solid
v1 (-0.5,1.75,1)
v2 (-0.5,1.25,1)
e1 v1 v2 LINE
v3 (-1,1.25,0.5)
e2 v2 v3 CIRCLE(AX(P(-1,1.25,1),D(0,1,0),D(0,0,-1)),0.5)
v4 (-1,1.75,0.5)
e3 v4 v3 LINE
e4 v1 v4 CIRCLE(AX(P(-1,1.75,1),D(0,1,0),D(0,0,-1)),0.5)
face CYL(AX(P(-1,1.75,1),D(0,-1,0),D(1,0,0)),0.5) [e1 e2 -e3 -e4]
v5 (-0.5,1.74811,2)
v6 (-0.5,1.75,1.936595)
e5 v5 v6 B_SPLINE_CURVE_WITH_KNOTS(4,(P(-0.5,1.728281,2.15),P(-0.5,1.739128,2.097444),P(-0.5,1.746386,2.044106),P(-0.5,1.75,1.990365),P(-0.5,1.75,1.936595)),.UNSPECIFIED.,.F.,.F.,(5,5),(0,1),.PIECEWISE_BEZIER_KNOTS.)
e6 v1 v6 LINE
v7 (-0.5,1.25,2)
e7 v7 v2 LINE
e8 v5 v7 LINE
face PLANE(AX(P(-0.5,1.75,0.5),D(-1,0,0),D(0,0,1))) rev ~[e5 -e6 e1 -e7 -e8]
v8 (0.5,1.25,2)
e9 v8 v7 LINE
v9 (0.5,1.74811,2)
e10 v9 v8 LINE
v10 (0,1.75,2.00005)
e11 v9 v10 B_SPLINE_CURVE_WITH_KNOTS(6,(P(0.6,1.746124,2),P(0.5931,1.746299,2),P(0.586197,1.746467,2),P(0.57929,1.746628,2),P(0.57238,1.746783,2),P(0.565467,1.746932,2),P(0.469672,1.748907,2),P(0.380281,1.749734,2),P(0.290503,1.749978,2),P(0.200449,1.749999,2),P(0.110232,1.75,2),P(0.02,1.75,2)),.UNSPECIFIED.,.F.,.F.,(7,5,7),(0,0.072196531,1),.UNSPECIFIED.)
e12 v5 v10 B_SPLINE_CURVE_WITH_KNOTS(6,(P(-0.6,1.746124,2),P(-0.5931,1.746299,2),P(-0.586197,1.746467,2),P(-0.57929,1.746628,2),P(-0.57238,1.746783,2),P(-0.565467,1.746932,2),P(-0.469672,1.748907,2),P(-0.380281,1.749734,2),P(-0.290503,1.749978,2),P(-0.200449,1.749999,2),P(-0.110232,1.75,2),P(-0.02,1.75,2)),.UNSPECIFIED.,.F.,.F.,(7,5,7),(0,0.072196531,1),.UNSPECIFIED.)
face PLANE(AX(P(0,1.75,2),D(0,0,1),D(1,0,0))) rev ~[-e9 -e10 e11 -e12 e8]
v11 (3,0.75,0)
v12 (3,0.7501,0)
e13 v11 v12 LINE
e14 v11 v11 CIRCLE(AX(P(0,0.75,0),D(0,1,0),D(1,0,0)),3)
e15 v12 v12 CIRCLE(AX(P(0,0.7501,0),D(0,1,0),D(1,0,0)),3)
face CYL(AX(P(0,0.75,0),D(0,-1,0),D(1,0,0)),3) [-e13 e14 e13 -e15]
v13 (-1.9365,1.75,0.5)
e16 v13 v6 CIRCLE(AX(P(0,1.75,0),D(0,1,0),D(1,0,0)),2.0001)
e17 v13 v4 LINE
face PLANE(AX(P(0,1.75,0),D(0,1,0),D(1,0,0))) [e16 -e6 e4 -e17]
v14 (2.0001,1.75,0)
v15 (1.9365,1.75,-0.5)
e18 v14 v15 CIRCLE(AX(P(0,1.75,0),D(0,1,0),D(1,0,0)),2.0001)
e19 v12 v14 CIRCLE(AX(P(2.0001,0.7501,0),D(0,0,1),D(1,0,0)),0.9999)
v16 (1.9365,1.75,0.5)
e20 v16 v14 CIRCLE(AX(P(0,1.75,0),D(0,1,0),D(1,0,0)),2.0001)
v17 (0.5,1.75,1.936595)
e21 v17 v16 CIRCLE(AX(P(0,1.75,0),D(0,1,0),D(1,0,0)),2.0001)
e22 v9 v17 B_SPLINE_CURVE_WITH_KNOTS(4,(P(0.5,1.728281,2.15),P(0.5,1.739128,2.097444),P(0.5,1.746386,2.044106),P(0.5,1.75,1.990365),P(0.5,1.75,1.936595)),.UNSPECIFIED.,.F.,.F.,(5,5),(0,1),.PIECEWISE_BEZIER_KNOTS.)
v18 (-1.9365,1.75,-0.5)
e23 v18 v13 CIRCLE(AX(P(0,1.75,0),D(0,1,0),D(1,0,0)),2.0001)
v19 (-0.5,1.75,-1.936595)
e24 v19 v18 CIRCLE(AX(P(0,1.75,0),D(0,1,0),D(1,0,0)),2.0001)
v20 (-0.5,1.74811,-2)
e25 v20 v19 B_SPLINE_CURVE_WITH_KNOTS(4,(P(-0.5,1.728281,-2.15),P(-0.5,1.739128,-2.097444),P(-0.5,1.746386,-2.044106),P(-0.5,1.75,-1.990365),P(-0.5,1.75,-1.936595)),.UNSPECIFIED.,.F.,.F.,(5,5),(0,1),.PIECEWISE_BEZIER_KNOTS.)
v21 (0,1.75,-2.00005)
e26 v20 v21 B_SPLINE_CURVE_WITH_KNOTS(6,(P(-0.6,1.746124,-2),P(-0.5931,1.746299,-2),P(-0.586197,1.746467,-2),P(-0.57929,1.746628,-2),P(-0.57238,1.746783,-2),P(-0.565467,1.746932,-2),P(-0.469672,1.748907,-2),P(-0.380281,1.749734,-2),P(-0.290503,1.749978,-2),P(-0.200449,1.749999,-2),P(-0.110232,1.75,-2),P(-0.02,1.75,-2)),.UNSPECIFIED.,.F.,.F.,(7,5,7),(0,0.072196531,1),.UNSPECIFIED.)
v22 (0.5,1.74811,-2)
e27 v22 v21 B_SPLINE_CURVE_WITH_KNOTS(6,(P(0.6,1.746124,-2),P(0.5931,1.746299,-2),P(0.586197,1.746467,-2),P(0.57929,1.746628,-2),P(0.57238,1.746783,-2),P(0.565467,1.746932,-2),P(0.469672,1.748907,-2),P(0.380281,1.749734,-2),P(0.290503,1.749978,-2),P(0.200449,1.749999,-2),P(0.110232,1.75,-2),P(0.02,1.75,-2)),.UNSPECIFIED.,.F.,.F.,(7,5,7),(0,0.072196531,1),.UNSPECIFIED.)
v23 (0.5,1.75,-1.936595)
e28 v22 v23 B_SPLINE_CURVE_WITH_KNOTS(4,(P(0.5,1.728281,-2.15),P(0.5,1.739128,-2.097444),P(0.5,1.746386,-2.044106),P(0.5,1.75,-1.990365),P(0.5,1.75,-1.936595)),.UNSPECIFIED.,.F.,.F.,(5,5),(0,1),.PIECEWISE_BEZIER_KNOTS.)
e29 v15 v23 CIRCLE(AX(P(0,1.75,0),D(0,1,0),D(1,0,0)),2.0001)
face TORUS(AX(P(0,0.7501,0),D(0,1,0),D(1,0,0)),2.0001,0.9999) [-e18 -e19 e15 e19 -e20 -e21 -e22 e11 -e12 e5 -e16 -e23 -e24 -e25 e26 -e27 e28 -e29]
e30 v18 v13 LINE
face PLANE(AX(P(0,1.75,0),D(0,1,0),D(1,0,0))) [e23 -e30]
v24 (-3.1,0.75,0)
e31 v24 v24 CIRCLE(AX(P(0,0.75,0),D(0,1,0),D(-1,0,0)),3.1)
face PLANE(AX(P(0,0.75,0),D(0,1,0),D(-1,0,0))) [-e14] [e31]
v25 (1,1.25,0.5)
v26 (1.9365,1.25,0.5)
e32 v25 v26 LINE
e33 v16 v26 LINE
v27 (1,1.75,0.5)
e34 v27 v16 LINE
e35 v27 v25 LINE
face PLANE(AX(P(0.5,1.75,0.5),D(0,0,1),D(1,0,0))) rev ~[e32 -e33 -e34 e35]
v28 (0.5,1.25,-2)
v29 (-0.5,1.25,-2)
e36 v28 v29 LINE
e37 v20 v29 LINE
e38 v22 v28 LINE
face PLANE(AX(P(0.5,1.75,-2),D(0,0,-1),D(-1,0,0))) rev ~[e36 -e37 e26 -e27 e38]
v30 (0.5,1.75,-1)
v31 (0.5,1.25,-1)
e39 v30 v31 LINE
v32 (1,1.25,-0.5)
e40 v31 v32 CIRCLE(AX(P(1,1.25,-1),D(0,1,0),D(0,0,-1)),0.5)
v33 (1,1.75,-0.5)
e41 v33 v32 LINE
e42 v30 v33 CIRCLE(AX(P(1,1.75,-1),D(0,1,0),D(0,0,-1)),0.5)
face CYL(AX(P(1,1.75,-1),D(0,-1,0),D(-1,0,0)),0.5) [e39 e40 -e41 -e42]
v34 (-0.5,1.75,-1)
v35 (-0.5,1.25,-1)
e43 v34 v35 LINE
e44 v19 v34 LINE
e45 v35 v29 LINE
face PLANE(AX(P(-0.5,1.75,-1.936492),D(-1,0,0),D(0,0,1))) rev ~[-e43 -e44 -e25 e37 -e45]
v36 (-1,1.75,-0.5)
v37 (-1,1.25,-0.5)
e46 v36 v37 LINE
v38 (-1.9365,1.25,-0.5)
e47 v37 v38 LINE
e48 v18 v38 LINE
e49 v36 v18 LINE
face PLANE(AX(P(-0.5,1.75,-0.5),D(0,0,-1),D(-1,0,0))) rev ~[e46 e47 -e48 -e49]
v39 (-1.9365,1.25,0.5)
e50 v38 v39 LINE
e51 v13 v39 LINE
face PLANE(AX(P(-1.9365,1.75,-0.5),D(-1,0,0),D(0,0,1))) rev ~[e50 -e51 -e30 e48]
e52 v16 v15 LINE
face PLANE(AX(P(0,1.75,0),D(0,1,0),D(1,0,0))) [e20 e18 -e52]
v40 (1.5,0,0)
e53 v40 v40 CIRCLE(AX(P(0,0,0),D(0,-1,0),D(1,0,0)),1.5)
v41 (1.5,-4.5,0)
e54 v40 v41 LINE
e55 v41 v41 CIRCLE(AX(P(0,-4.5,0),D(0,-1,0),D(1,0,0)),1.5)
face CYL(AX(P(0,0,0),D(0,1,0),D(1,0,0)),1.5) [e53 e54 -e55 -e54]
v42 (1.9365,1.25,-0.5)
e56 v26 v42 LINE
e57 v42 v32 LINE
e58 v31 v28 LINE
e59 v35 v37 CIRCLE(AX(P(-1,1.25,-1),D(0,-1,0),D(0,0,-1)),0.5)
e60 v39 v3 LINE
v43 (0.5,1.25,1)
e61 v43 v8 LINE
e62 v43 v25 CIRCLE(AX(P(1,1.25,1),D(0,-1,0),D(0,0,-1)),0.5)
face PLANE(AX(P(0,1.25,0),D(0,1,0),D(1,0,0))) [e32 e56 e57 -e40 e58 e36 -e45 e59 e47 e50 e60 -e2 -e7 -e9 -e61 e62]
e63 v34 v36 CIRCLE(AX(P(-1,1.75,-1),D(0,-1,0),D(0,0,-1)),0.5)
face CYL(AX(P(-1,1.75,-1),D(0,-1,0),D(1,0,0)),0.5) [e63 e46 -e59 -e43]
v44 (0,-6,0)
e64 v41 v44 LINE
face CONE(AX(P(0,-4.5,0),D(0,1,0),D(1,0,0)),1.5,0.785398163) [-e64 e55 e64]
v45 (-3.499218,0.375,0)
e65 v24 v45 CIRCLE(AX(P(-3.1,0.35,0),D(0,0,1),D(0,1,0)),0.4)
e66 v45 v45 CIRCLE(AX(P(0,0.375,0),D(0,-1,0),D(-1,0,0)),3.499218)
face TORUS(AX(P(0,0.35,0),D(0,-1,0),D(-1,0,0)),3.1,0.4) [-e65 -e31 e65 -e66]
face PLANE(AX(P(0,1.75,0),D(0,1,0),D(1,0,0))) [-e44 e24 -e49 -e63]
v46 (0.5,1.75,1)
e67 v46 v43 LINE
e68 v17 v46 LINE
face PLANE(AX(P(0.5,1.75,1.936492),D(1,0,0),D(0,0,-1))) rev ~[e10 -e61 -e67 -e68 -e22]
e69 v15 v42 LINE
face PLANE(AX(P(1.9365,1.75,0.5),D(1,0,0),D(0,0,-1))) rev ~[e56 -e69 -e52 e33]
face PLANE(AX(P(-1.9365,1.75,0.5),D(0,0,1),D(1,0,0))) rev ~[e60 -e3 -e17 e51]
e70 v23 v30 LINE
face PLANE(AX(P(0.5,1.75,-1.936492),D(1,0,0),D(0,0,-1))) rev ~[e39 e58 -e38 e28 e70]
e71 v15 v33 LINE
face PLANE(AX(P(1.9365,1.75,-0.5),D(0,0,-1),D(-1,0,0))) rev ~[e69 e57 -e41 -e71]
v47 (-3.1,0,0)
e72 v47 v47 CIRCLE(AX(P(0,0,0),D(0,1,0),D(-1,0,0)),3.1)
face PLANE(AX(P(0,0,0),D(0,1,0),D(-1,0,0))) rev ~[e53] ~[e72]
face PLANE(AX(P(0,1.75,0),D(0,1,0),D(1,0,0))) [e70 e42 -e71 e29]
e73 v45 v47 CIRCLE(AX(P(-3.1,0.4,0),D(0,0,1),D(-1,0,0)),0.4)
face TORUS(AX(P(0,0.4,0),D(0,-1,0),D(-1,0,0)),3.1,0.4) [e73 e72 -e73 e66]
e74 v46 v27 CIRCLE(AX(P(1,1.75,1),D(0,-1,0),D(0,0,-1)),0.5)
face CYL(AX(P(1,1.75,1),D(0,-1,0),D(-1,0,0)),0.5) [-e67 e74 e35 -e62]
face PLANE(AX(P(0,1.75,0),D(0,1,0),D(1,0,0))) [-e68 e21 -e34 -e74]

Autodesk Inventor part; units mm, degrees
ref_plane "YZ Plane" through (0, 0, 0) normal (1, 0, 0) x (0, 1, 0)
ref_plane "XZ Plane" through (0, 0, 0) normal (0, 1, 0) x (-1, 0, 0)
ref_plane "XY Plane" through (0, 0, 0) normal (0, 0, 1) x (1, 0, 0)
sketch "Sketch1" plane through (0, 0, 0) normal (0, 1, 0) x (-1, 0, 0)
  circle A0 centre (0, 0) radius 3.5
  dimension "d0" = 7
extrude "Extrusion1" add sketch "Sketch1" along normal blind 0.75
sketch "Sketch2" plane through (0, 0.75, 0) normal (0, 1, 0) x (1, 0, 0)
  circle A0 centre (0, 0) radius 3
  dimension "d3" = 6
extrude "Extrusion2" add sketch "Sketch2" along normal blind 1
fillet "Fillet1" radius 1 1 edges at (-3, 1.75, 0)
fillet "Fillet2" radius 0.4 2 edges at (3.5, 0.75, 0) (3.5, 0, 0)
sketch "Sketch3" plane through (0, 0, 0) normal (0, -1, 0) x (1, 0, 0)
  circle A0 centre (0, 0) radius 1.5
  dimension "d8" = 3
extrude "Extrusion3" add sketch "Sketch3" along normal blind 6
chamfer "Chamfer1" distance 1.5 angle 45 1 edges at (-1.5, -6, 0)
thread "Thread1" size "M3x0.5" class "6g" standard "ANSI Metric M Profile" length 10
thread "Thread2" size "R 3" standard "ISO Taper" length 10
sketch "Sketch4" plane through (0, 1.75, 0) normal (0, 1, 0) x (1, 0, 0)
  line L0 (0.5, 2) -> (-0.5, 2)
  line L1 (-0.5, 2) -> (-0.5, -2)
  line L2 (-0.5, -2) -> (0.5, -2)
  line L3 (0.5, -2) -> (0.5, 2)
  line L4 (0.5, 2) -> (-0.5, -2) construction
  line L5 (-0.5, 2) -> (0.5, -2) construction
  circle A0 centre (0, 0) radius 2 projected
  line L6 (1.9365, 0.5) -> (-1.9365, 0.5)
  line L7 (-1.9365, 0.5) -> (-1.9365, -0.5)
  line L8 (-1.9365, -0.5) -> (1.9365, -0.5)
  line L9 (1.9365, -0.5) -> (1.9365, 0.5)
  line L10 (1.9365, 0.5) -> (-1.9365, -0.5) construction
  line L11 (-1.9365, 0.5) -> (1.9365, -0.5) construction
  dimension "d18" = 1
  dimension "d19" = 4
  dimension "d20" = 1
extrude "Extrusion4" cut sketch "Sketch4" against normal blind 0.5 contours L3 A0 L0 | A0 L1 L0 | A0 L3 L6 L1 | L6 L9 L8 L3 | L3 L8 L1 L6 | L1 L8 L7 L6 | L3 A0 L1 L8 | L3 L2 A0 | A0 L2 L1
fillet "Fillet3" radius 0.5 4 edges at (0.5, 1.5, 0.5) (0.5, 1.5, -0.5) (-0.5, 1.5, -0.5) (-0.5, 1.5, 0.5)
properties part number "Screw"
